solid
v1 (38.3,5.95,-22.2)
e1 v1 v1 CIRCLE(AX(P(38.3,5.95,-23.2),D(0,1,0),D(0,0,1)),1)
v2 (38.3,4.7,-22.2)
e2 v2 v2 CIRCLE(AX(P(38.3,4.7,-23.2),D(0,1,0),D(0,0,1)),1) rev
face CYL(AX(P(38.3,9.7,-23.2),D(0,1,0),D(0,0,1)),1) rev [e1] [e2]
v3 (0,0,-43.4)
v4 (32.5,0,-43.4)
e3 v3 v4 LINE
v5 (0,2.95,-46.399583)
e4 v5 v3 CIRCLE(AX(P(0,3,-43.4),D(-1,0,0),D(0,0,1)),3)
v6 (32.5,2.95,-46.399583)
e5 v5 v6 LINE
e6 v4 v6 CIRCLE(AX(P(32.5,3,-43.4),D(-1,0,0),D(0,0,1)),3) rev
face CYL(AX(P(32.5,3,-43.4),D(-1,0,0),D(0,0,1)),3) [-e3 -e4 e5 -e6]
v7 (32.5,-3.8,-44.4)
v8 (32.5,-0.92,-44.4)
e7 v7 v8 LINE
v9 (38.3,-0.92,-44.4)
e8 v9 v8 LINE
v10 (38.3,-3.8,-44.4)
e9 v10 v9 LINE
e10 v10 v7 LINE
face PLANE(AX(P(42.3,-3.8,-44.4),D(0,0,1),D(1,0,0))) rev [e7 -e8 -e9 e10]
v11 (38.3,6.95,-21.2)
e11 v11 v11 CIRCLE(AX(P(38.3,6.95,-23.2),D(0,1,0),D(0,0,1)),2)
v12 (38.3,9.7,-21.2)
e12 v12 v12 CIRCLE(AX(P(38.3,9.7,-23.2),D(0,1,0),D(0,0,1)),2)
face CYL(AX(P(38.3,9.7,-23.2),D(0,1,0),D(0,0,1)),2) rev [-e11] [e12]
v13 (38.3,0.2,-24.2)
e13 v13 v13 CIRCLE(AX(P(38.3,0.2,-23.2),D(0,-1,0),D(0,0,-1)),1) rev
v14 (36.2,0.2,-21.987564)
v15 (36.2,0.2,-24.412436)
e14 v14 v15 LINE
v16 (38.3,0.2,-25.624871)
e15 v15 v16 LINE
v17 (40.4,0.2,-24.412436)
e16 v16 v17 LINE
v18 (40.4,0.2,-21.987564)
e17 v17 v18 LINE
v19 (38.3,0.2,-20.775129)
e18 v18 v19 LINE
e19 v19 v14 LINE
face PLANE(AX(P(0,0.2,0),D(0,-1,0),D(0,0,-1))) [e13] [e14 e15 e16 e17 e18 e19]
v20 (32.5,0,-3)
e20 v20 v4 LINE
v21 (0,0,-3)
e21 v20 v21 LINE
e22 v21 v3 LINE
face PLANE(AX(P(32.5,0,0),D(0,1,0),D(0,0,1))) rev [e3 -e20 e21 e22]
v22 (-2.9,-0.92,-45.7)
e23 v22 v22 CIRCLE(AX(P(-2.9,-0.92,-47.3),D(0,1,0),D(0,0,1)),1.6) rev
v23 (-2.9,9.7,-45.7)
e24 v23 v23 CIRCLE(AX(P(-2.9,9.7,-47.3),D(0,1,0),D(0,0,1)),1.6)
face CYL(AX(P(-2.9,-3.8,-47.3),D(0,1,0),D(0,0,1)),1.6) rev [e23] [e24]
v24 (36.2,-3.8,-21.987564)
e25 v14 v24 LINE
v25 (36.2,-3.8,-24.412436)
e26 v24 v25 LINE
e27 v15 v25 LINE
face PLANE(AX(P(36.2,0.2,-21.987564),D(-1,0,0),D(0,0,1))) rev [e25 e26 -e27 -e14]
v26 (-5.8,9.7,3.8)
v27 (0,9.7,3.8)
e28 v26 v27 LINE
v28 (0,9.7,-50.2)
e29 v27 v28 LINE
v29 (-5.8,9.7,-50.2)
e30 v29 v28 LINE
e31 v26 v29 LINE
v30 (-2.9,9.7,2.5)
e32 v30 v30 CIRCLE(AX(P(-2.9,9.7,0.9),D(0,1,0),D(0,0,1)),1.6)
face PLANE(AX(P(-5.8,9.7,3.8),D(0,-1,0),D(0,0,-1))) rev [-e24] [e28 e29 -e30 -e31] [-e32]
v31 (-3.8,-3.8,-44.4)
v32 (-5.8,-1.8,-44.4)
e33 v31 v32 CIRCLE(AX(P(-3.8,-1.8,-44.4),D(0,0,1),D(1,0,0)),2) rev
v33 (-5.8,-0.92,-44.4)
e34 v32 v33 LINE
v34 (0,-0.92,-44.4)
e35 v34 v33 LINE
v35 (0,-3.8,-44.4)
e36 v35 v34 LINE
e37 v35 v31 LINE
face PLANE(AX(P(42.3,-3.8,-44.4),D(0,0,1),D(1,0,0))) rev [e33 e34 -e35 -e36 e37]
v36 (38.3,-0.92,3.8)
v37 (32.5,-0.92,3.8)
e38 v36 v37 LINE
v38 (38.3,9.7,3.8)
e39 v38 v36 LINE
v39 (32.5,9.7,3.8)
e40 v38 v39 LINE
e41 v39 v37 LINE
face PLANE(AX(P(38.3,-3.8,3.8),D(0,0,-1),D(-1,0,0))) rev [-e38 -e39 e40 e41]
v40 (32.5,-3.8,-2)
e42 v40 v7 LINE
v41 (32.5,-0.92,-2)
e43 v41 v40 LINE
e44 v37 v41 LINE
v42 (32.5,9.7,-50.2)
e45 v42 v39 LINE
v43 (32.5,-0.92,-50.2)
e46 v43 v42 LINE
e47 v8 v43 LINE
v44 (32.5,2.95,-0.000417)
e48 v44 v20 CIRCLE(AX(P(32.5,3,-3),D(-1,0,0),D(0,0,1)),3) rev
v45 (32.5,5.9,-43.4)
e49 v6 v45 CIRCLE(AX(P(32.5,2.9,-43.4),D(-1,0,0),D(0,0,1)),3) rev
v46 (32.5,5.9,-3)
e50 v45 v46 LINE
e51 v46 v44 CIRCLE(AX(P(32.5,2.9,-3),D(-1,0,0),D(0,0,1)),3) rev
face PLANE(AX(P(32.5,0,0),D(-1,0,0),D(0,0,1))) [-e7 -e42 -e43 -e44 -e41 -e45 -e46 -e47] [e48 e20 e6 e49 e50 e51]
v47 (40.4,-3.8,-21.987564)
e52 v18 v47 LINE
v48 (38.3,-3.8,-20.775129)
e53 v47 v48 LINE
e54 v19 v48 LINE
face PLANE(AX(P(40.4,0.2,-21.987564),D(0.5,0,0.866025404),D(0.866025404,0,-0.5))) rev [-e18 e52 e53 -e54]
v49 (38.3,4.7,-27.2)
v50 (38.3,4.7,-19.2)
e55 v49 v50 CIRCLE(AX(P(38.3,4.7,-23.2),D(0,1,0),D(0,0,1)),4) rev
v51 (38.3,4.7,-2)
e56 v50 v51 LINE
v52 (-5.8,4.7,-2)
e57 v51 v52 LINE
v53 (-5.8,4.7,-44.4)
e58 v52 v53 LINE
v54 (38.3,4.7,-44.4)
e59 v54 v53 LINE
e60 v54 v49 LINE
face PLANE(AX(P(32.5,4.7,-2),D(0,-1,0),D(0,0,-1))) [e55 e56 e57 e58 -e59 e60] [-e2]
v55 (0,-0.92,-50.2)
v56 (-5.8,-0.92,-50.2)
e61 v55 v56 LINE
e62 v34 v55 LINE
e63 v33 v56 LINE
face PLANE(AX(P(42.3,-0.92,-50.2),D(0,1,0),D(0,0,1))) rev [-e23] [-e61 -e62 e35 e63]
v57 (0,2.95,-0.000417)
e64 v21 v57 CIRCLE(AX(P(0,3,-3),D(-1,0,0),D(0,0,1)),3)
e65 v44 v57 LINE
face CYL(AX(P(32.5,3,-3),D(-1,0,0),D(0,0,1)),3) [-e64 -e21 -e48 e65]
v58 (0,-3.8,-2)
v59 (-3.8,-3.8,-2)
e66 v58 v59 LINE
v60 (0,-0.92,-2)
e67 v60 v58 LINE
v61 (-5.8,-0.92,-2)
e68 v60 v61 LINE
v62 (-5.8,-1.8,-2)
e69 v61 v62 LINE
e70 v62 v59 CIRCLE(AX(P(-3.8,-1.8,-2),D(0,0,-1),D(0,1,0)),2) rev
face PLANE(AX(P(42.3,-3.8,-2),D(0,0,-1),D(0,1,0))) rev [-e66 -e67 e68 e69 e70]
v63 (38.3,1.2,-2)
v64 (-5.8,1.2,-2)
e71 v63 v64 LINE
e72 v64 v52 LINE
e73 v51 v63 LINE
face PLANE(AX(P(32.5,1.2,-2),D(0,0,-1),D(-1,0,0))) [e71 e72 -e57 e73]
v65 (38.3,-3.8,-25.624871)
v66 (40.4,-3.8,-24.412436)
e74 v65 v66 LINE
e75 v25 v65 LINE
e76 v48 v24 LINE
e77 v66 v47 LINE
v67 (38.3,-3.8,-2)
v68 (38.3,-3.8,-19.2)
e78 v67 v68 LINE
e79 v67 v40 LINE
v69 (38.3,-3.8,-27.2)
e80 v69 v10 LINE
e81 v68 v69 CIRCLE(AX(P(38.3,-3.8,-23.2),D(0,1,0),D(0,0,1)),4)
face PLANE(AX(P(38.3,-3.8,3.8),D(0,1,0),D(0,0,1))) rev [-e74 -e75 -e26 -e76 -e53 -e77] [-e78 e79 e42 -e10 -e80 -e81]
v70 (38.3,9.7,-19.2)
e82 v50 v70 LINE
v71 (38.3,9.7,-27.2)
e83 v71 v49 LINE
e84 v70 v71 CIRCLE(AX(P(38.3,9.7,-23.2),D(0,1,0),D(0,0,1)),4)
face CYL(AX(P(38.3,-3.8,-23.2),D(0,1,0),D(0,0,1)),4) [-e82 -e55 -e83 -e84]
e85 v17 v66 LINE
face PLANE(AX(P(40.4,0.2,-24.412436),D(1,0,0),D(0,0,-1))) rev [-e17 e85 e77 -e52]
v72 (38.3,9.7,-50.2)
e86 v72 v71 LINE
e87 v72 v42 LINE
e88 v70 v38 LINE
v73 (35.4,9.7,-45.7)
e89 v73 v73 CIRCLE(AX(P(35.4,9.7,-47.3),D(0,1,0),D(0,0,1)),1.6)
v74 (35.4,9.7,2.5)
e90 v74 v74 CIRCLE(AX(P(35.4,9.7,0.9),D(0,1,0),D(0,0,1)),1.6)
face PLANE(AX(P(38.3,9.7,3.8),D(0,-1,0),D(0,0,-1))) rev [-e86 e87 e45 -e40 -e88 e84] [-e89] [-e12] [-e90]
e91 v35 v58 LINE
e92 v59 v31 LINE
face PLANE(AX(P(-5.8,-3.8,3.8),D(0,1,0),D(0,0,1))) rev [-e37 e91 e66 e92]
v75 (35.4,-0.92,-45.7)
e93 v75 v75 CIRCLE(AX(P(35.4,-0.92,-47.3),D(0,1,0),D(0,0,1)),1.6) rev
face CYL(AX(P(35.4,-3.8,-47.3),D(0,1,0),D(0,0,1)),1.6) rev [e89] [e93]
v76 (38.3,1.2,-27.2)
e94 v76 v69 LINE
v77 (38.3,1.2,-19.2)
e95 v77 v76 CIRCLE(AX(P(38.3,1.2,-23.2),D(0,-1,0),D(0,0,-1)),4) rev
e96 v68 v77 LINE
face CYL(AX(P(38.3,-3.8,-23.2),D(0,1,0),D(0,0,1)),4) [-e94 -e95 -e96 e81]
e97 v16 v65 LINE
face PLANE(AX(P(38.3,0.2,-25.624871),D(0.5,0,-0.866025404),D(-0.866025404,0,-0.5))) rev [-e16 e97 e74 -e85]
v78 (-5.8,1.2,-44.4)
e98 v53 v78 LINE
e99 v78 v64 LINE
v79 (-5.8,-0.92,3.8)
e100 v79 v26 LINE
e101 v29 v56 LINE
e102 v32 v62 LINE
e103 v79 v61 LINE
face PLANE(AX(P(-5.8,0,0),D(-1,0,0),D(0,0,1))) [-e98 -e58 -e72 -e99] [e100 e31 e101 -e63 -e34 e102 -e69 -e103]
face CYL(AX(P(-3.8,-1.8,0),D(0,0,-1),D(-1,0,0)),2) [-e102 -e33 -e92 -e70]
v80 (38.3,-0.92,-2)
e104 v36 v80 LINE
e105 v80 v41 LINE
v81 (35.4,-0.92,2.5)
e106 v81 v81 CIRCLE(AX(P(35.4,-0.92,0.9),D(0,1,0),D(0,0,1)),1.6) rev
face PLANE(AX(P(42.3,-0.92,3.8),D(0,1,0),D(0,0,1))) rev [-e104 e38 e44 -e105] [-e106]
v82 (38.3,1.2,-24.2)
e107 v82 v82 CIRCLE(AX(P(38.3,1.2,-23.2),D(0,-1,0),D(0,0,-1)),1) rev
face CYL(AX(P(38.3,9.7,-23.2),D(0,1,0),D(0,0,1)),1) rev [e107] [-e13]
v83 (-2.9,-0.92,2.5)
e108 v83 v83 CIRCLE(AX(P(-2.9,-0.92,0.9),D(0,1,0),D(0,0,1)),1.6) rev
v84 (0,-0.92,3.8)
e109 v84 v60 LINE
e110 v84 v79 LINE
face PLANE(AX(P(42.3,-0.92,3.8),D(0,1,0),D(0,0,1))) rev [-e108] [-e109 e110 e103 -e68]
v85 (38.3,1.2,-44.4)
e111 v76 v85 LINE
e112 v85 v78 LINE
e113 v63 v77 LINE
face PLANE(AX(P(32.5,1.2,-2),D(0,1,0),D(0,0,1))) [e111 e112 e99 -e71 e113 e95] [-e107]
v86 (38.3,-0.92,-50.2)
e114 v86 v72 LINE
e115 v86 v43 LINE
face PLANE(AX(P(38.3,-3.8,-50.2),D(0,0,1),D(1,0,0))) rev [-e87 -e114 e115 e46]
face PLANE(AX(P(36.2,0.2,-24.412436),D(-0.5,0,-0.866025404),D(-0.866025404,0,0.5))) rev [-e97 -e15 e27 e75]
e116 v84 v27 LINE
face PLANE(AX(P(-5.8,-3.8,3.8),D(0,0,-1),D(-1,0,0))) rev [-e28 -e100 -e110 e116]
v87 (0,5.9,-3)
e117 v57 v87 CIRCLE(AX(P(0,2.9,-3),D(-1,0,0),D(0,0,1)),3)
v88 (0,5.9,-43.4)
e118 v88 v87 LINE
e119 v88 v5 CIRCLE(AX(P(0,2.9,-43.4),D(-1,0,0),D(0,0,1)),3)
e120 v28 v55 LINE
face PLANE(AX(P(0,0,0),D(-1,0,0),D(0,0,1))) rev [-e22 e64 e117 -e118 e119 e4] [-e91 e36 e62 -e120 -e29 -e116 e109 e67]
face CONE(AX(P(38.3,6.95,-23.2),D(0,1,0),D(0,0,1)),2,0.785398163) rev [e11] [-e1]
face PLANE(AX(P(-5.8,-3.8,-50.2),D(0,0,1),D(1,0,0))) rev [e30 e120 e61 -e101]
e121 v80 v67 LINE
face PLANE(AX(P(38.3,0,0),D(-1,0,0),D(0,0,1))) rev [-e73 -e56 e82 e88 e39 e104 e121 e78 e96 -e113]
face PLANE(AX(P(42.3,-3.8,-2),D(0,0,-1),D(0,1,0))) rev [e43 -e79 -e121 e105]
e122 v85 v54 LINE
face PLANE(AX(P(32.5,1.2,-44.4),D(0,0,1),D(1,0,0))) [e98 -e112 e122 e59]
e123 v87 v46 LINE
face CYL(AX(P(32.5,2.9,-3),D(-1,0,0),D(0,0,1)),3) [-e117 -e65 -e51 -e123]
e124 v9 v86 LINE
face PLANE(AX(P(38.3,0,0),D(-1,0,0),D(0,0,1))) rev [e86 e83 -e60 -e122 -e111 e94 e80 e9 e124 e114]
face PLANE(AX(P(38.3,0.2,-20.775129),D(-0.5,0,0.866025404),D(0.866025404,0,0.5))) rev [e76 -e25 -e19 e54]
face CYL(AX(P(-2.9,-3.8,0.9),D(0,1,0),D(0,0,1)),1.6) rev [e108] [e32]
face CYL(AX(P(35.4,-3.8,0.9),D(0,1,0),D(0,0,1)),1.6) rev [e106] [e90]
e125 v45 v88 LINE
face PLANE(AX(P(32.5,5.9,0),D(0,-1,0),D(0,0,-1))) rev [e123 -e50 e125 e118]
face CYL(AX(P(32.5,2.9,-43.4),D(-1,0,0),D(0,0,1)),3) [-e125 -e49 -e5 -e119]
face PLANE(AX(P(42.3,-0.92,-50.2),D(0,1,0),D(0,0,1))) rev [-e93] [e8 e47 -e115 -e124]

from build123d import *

# Parameters (mm, degrees)
SKETCH1_W           = 46.4
SKETCH1_H           = 5.9
SKETCH1_W_2         = 42.4
SKETCH1_H_2         = 3.5
BOSS_EXTRUDE1_DEPTH = 32.5
FILLET2_R           = 3
SKETCH2_W           = 54
SKETCH2_H           = 13.5
SKETCH2_W_2         = 42.4
SKETCH2_H_2         = 3.5
BOSS_EXTRUDE2_DEPTH = 5.8
SKETCH3_W           = 54
SKETCH3_H           = 13.5
SKETCH3_W_2         = 42.4
SKETCH3_H_2         = 3.5
BOSS_EXTRUDE3_DEPTH = 5.8
SKETCH4_R           = 1.6
CUT_EXTRUDE1_DEPTH  = 65.569187698
SKETCH8_R           = 4
BOSS_EXTRUDE4_DEPTH = 13.5
CUT_EXTRUDE4_DEPTH  = 4
SKETCH15_W          = 42.4
SKETCH15_H          = 3.5
SKETCH15_W_2        = 5.8
SKETCH15_H_2        = 2.88
CUT_EXTRUDE5_DEPTH  = 71.197863215
FILLET3_R           = 2


with BuildPart() as part:
    # Sketch1 → Boss-Extrude1 (new body)
    with BuildSketch(Plane(origin=(0, 0, 0), x_dir=(0, 0, -1), z_dir=(1, 0, 0))):
        with Locations((23.2, 2.95)):
            Rectangle(SKETCH1_W, SKETCH1_H)
        with Locations((23.2, 2.95)):
            Rectangle(SKETCH1_W_2, SKETCH1_H_2, mode=Mode.SUBTRACT)
    extrude(amount=BOSS_EXTRUDE1_DEPTH)

    # Fillet2
    # the kernel refuses this fillet: 3 mm, written as the material it takes off along each edge
    with BuildSketch(Plane(origin=(-7.5, 0, -46.4), x_dir=(0, 0, 1), z_dir=(1, 0, 0)), Plane(origin=(-7.5, 5.9, 0), x_dir=(0, 0, -1), z_dir=(1, 0, 0)), Plane(origin=(-7.5, 5.9, -46.4), x_dir=(0, -1, 0), z_dir=(1, 0, 0))) as fillet2_piece_1:
        with BuildLine():
            CenterArc((FILLET2_R, -FILLET2_R), FILLET2_R, 90, 90)
            Line((0, -FILLET2_R), (0, 0))
            Line((0, 0), (FILLET2_R, 0))
        make_face()
    extrude(amount=47.5, mode=Mode.SUBTRACT)
    with BuildSketch(Plane(origin=(-7.5, 0, 0), x_dir=(0, 0, -1), z_dir=(1, 0, 0))) as fillet2_piece_2:
        with BuildLine():
            CenterArc((FILLET2_R, FILLET2_R), FILLET2_R, 180, 90)
            Line((0, FILLET2_R), (0, 0))
            Line((0, 0), (FILLET2_R, 0))
        make_face()
    extrude(amount=47.5, mode=Mode.SUBTRACT)

    # Sketch2 → Boss-Extrude2 (add)
    with BuildSketch(Plane(origin=(32.5, 0, 0), x_dir=(0, 0, -1), z_dir=(1, 0, 0))):
        with Locations((23.2, 2.95)):
            Rectangle(SKETCH2_W, SKETCH2_H)
        with Locations((23.2, 2.95)):
            Rectangle(SKETCH2_W_2, SKETCH2_H_2, mode=Mode.SUBTRACT)
    extrude(amount=BOSS_EXTRUDE2_DEPTH)

    # Sketch3 → Boss-Extrude3 (add)
    with BuildSketch(Plane.ZY):
        with Locations((-23.2, 2.95)):
            Rectangle(SKETCH3_W, SKETCH3_H)
        with Locations((-23.2, 2.95)):
            Rectangle(SKETCH3_W_2, SKETCH3_H_2, mode=Mode.SUBTRACT)
    extrude(amount=BOSS_EXTRUDE3_DEPTH)

    # Sketch4 → Cut-Extrude1 (cut, through all)
    with BuildSketch(Plane(origin=(0, 9.7, 0), x_dir=(1, 0, 0), z_dir=(0, 1, 0))):
        with Locations(Location((-2.9, 47.3, 0), (0, 0, 270))):
            Circle(SKETCH4_R)
        with Locations(Location((35.4, 47.3, 0), (0, 0, 270))):
            Circle(SKETCH4_R)
        with Locations(Location((-2.9, -0.9, 0), (0, 0, 270))):
            Circle(SKETCH4_R)
        with Locations(Location((35.4, -0.9, 0), (0, 0, 270))):
            Circle(SKETCH4_R)
    extrude(amount=-CUT_EXTRUDE1_DEPTH, mode=Mode.SUBTRACT)

    # Sketch8 → Boss-Extrude4 (add)
    with BuildSketch(Plane(origin=(0, 9.7, 0), x_dir=(1, 0, 0), z_dir=(0, 1, 0))):
        with Locations(Location((38.3, 23.2, 0), (0, 0, 270))):
            Circle(SKETCH8_R)
    extrude(amount=-BOSS_EXTRUDE4_DEPTH)

    # Sketch13 → CSK for M2 Flat Head Machine Screw1 (revolve, cut)
    with BuildSketch(Plane(origin=(38.3, 9.7, -23.2), x_dir=(0, 0, 1), z_dir=(1, 0, 0))):
        Polygon((0, 0), (0, 13.5), (1, 13.5), (1, 3.75), (2, 2.75), (2, 0), align=None)
    revolve(axis=Axis((38.3, 16.05, -23.2), (0, -1, 0)), mode=Mode.SUBTRACT)

    # Sketch14 → Cut-Extrude4 (cut)
    with BuildSketch(Plane.XZ.offset(3.8)):
        Polygon((38.3, -20.775128869), (36.2, -21.987564435), (36.2, -24.412435565), (38.3, -25.624871131), (40.4, -24.412435565), (40.4, -21.987564435), align=None)
    extrude(amount=-CUT_EXTRUDE4_DEPTH, mode=Mode.SUBTRACT)

    # Sketch15 → Cut-Extrude5 (cut, through all)
    with BuildSketch(Plane.ZY.offset(5.8)):
        with Locations((-23.2, 2.95)):
            Rectangle(SKETCH15_W, SKETCH15_H)
        with Locations((-47.3, -2.36)):
            Rectangle(SKETCH15_W_2, SKETCH15_H_2)
        with Locations((0.9, -2.36)):
            Rectangle(SKETCH15_W_2, SKETCH15_H_2)
    extrude(amount=-CUT_EXTRUDE5_DEPTH, mode=Mode.SUBTRACT)

    # Fillet3
    fillet3_edges = [part.edges().sort_by_distance(p)[0] for p in [
        (-5.8, -3.8, -23.2),
    ]]
    fillet(fillet3_edges, radius=FILLET3_R)


solid = part.part
